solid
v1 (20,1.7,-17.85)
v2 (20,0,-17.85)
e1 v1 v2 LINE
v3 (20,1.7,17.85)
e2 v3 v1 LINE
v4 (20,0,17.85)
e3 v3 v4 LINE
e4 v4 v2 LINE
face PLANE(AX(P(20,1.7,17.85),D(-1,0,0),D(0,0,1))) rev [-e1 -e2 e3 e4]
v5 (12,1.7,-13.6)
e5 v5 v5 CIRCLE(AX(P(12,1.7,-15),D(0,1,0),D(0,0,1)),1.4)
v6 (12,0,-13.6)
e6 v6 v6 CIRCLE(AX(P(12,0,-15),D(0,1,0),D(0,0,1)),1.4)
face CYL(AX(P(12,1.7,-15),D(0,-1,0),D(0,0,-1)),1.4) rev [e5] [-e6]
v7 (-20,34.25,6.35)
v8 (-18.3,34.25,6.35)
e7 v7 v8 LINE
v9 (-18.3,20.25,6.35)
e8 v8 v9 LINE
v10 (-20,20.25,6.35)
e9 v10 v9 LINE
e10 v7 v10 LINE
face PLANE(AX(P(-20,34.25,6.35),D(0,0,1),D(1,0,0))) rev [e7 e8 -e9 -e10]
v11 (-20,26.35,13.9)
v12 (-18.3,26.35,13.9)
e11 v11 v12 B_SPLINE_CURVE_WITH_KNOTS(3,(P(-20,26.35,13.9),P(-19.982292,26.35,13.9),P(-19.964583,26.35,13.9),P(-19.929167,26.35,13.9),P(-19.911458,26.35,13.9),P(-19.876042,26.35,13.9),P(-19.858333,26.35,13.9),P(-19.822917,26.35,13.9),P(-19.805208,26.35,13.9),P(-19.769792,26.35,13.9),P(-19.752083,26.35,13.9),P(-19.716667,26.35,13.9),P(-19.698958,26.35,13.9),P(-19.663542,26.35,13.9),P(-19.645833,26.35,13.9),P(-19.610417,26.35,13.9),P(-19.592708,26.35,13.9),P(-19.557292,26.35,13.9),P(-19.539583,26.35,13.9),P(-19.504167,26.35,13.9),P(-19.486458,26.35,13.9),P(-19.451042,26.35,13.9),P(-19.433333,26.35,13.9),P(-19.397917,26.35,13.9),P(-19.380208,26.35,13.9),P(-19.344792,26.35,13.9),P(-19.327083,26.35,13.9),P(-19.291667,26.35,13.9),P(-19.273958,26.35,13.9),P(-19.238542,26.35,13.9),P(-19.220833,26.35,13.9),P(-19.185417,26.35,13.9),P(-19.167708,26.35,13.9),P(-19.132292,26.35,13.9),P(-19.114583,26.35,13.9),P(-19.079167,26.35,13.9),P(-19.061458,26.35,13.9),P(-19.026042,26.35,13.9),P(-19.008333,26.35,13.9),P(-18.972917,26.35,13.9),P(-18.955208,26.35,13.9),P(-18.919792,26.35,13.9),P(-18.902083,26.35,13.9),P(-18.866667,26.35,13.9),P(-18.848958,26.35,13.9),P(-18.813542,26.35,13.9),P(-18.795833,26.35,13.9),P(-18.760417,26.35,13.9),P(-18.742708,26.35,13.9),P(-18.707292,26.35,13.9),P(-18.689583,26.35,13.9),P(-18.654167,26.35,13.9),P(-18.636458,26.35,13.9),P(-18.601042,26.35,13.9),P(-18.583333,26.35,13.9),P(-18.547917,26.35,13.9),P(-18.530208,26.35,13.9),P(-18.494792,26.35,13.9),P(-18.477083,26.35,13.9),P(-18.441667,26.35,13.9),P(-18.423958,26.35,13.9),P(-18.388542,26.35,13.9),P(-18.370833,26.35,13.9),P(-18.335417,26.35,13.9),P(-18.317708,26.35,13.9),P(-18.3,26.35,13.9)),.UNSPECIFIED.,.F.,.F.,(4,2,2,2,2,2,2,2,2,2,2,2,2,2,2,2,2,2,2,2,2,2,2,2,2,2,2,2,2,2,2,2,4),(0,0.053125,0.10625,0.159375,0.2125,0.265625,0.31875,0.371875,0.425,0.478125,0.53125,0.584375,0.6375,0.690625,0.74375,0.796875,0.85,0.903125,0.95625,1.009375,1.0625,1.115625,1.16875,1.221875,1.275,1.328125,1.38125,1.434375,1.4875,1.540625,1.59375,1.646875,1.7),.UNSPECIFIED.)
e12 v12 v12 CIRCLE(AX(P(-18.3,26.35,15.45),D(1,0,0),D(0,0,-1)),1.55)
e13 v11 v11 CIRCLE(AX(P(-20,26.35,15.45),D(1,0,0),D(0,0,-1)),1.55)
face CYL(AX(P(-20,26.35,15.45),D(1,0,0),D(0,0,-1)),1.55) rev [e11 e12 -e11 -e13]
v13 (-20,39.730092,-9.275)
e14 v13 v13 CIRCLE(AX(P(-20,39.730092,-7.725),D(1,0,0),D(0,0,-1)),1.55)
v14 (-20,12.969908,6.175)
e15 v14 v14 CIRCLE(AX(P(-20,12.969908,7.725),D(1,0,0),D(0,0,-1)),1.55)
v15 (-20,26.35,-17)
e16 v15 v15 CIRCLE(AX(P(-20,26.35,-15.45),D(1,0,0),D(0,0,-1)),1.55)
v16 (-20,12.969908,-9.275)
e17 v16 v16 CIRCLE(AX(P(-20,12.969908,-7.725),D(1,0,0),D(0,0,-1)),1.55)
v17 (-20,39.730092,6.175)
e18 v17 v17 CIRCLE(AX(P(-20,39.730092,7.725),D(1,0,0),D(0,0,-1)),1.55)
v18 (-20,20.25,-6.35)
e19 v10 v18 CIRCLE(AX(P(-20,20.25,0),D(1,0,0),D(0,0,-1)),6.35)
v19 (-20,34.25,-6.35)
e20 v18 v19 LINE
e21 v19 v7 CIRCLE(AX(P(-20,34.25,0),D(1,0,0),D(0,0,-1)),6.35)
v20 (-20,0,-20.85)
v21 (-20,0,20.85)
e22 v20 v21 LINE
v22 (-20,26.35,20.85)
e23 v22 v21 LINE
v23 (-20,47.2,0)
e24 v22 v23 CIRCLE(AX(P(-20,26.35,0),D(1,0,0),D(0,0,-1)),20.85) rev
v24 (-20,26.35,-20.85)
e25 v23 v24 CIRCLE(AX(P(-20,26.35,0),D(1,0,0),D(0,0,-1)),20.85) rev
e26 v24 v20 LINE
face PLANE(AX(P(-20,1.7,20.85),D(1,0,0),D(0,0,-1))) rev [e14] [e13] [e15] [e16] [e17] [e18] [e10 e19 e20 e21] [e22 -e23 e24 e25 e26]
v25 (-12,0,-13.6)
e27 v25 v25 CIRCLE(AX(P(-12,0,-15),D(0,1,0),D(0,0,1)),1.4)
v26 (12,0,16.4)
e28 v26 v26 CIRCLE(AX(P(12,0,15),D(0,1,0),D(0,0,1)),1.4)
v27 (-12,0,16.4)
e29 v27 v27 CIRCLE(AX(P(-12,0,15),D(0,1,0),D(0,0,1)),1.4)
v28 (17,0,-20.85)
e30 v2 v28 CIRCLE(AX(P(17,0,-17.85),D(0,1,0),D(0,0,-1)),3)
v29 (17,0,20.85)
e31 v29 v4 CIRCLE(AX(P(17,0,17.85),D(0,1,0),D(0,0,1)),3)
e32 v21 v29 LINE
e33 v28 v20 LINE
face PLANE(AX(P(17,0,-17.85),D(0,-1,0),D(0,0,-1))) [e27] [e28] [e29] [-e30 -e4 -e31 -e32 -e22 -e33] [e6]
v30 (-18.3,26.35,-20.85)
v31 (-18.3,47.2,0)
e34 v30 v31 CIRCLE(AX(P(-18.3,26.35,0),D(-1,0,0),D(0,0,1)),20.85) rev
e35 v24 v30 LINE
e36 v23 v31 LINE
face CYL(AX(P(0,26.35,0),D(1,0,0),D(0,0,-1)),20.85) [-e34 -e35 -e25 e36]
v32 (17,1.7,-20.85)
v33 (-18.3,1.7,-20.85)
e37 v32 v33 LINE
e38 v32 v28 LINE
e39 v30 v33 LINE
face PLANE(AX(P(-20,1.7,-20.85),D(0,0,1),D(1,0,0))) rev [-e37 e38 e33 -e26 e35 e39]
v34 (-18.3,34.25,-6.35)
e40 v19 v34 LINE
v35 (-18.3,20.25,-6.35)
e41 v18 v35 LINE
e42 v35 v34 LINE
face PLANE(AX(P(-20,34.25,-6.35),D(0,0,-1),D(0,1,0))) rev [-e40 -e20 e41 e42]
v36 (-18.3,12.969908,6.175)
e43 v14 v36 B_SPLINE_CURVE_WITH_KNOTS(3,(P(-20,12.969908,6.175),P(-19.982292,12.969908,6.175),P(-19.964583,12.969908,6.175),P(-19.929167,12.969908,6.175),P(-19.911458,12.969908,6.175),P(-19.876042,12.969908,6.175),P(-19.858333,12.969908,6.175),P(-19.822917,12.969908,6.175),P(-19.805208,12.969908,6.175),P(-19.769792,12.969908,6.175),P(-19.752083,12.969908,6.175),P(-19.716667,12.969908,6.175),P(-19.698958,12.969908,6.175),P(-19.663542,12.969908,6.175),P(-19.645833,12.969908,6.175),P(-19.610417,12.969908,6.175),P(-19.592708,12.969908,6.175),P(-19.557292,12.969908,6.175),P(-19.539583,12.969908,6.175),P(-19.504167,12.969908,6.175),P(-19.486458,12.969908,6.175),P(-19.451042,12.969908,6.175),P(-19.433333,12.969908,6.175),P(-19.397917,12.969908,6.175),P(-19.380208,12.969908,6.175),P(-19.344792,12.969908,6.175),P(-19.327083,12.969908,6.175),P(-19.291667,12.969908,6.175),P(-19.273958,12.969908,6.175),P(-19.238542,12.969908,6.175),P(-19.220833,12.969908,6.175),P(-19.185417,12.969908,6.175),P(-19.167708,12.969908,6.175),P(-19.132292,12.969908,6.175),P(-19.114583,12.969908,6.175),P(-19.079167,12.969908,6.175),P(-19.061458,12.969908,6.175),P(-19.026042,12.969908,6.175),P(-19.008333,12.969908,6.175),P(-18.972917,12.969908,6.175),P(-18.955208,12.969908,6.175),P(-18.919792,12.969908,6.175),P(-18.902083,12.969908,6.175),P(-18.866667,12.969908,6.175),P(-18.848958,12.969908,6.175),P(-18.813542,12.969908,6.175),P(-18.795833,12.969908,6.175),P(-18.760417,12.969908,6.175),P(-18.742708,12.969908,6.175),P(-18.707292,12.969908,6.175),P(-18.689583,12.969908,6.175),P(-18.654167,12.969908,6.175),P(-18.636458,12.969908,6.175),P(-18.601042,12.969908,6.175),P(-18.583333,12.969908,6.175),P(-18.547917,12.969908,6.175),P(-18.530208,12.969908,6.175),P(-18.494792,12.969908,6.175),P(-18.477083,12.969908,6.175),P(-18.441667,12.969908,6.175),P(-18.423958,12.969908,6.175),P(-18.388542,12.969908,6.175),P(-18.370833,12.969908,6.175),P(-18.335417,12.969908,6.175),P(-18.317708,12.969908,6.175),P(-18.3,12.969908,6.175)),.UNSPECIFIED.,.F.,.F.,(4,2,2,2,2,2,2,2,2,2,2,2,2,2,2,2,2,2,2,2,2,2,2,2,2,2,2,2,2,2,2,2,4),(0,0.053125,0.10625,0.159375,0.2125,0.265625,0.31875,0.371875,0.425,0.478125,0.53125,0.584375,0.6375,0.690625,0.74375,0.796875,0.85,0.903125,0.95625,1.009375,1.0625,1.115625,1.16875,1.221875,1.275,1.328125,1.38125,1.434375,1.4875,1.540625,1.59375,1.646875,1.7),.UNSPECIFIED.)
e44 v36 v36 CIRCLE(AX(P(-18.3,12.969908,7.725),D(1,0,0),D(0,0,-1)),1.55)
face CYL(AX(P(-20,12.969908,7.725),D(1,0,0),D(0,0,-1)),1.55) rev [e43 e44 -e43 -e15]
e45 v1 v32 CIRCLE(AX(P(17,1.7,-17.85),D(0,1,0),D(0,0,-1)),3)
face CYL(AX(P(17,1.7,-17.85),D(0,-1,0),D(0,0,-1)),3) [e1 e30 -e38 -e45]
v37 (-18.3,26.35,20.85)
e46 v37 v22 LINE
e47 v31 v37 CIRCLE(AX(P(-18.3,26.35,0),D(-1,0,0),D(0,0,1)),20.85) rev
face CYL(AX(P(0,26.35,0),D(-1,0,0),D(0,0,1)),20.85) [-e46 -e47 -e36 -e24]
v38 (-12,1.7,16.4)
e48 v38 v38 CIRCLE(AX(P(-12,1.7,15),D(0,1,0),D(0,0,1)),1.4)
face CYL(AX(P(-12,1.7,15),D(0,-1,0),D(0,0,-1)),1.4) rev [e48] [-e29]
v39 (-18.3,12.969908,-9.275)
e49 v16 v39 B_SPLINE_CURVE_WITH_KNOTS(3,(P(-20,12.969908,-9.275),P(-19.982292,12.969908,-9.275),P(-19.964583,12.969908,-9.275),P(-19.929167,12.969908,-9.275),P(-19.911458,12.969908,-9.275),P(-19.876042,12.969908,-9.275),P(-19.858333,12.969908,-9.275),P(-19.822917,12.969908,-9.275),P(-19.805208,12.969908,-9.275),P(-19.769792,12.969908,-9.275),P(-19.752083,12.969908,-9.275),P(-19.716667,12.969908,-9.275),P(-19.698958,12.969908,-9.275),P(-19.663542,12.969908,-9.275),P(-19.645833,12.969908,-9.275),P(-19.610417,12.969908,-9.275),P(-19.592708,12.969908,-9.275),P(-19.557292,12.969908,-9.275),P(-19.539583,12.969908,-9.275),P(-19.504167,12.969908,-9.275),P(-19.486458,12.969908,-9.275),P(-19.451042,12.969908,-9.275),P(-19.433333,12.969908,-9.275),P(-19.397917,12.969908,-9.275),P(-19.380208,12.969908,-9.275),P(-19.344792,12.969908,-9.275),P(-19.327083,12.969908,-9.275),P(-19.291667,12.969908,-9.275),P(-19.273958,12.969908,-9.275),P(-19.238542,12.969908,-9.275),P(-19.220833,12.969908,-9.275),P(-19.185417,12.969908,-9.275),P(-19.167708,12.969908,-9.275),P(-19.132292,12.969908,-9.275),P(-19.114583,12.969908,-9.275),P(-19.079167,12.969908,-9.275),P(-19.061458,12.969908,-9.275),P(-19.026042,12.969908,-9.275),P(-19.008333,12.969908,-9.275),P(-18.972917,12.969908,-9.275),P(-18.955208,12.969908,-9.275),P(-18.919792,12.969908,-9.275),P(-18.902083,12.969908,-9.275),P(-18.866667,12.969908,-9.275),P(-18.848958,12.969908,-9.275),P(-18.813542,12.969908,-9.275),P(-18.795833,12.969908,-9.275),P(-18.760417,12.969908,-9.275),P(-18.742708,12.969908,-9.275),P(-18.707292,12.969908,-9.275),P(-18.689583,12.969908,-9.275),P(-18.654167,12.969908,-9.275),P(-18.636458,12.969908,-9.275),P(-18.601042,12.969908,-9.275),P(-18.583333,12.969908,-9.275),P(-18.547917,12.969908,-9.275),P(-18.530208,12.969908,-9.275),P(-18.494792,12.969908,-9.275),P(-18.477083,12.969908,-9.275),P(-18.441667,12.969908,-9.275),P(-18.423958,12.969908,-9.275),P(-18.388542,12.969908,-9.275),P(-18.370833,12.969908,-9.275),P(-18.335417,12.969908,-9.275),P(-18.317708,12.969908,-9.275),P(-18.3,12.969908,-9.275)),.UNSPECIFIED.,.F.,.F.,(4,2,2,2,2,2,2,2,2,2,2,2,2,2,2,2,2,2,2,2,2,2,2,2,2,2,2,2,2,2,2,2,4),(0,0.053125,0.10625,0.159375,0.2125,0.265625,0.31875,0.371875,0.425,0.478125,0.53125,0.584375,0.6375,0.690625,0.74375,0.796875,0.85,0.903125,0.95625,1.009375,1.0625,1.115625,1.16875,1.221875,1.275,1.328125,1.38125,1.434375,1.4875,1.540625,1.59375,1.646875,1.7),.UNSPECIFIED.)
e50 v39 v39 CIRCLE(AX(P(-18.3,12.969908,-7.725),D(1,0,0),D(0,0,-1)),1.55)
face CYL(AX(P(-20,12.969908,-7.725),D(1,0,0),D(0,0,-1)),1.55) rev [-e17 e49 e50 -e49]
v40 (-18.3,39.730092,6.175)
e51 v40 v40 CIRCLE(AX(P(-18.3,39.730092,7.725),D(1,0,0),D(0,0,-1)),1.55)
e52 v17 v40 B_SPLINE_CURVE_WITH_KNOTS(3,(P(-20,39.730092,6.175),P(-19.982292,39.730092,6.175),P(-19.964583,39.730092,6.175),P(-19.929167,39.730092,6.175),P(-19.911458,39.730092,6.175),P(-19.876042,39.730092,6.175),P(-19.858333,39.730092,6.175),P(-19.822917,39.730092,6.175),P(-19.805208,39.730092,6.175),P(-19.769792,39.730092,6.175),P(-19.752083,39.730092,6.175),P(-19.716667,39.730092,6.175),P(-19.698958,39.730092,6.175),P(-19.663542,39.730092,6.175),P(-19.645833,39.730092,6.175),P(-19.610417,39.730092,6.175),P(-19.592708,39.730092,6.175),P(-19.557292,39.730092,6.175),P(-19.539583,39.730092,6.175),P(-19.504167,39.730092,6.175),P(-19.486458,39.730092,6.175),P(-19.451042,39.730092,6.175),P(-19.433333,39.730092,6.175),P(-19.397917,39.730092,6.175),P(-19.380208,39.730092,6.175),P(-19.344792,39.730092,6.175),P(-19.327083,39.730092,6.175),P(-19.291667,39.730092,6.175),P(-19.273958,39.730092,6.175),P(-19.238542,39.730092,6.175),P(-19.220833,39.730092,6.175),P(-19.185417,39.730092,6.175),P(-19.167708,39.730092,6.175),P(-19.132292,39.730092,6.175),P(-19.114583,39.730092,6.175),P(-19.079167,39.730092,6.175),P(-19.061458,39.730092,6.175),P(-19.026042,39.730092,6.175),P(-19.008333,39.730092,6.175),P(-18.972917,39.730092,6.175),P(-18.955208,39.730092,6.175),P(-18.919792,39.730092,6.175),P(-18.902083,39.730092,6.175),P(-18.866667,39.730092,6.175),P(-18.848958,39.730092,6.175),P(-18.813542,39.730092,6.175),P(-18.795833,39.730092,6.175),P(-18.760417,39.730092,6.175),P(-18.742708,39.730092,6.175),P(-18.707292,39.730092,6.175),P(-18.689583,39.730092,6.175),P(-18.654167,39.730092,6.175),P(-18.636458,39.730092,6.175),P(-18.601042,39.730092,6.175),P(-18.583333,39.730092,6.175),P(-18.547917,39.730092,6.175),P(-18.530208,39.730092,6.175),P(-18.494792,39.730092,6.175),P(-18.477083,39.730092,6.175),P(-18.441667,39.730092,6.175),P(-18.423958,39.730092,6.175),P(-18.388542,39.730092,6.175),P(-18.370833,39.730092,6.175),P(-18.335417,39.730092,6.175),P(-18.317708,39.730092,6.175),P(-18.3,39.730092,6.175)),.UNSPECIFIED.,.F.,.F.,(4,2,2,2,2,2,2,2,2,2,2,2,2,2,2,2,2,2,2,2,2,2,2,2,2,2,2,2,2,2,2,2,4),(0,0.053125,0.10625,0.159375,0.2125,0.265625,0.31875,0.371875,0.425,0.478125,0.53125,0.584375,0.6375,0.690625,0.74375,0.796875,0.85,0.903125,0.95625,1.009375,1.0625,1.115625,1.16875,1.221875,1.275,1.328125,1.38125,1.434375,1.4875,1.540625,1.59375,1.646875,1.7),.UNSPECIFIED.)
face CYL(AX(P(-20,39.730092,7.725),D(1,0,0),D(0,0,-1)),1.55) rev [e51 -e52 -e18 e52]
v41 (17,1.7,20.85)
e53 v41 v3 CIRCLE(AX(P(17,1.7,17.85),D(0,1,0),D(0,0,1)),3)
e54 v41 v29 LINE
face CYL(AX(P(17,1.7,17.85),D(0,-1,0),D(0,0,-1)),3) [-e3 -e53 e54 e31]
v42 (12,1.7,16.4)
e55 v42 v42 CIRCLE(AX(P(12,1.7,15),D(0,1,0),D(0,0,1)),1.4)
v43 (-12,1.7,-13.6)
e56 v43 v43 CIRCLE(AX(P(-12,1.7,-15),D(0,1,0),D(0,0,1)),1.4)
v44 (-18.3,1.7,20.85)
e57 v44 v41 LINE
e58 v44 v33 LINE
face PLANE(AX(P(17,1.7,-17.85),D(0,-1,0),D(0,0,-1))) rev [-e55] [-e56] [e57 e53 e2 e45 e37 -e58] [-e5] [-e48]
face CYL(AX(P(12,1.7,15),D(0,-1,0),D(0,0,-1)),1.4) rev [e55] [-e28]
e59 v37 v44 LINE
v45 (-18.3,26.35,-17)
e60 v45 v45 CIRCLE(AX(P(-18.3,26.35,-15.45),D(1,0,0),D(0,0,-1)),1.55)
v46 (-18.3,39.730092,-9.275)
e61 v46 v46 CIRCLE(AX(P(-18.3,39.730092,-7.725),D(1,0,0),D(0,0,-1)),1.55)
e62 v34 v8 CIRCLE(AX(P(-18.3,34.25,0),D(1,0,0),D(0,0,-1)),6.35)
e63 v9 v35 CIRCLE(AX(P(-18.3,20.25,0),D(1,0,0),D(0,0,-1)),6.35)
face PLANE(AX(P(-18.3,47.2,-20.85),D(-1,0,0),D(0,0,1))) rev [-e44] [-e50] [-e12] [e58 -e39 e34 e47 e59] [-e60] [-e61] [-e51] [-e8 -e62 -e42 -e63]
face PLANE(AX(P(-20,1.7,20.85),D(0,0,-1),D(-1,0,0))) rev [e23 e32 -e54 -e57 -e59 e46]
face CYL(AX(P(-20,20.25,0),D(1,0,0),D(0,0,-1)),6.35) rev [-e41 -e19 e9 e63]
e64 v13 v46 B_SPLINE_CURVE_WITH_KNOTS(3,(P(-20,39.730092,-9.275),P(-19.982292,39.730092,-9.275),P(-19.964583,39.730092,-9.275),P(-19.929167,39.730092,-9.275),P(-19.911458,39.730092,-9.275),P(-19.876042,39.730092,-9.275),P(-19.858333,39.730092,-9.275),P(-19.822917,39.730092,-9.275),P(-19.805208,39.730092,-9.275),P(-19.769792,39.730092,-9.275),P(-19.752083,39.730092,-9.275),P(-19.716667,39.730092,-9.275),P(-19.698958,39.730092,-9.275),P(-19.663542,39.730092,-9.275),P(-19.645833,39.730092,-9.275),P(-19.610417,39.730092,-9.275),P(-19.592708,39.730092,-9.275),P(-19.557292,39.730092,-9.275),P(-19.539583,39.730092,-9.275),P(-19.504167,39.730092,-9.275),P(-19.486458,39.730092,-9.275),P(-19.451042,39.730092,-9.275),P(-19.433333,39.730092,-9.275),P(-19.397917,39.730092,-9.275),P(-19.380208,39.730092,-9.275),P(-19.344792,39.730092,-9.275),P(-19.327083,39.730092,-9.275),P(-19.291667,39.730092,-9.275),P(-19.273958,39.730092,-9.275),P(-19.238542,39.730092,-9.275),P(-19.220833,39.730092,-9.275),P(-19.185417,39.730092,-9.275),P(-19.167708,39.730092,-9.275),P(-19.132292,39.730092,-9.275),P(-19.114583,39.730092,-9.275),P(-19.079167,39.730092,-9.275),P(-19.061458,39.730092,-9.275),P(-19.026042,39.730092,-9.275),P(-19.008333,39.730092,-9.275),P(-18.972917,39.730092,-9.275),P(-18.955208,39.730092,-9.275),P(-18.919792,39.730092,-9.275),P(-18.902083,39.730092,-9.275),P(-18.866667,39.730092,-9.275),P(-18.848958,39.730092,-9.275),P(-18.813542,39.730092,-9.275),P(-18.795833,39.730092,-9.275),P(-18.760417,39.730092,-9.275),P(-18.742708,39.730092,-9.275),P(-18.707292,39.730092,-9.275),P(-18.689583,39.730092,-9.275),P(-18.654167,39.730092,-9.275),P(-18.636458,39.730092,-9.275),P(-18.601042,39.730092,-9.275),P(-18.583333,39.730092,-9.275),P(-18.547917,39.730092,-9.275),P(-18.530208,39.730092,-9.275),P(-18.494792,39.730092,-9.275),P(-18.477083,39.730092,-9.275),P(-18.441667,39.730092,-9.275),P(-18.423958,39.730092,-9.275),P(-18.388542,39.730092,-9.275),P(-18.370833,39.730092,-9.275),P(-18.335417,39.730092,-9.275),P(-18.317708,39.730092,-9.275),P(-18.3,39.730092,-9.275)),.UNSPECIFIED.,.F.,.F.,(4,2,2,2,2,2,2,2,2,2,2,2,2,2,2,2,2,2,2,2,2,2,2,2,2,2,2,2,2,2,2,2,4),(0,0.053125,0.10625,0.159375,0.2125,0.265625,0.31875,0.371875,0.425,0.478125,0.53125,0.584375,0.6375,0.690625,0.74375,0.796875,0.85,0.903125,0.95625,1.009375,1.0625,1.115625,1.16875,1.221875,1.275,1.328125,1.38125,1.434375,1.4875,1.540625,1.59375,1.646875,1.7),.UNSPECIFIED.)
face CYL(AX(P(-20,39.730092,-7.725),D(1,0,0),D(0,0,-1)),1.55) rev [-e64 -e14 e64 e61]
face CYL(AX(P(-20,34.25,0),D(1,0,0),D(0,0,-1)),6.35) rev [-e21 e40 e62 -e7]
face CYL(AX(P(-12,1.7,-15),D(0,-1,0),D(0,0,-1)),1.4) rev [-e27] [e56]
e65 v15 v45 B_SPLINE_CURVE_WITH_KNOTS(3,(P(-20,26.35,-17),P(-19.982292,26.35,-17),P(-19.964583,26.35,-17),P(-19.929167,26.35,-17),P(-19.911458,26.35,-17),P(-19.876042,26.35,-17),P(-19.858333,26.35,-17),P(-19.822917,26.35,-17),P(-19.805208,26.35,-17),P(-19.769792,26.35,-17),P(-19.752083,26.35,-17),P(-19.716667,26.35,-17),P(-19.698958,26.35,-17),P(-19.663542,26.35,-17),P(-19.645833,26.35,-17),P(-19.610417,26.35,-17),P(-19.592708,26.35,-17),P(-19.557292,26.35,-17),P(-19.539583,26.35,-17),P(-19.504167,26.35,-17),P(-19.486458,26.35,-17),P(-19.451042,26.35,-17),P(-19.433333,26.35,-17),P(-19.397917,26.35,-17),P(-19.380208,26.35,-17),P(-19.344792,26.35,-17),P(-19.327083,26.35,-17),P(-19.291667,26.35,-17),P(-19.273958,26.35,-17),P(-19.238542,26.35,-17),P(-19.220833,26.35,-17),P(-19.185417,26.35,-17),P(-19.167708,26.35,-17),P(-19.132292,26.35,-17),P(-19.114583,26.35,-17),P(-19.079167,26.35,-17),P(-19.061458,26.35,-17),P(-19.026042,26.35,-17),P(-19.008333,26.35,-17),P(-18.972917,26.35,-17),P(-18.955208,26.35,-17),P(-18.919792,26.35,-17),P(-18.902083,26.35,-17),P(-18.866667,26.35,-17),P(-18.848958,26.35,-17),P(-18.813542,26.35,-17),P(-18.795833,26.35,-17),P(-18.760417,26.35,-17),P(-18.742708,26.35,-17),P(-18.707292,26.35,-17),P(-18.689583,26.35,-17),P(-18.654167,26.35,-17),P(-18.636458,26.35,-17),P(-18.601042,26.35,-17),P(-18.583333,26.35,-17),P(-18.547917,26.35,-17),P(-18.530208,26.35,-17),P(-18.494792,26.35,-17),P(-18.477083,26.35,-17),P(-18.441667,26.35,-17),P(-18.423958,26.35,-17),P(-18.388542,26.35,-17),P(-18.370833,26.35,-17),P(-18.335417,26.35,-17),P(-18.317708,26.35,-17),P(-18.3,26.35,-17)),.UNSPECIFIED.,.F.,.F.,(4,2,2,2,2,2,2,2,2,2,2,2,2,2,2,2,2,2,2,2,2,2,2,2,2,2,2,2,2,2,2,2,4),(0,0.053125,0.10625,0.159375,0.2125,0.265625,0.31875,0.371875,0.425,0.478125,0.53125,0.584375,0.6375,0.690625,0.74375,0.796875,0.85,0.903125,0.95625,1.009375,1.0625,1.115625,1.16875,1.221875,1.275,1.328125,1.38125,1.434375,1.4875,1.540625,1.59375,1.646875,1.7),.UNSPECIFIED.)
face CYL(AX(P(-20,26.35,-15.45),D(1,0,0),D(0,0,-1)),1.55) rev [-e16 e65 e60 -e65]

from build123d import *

# Parameters (mm, degrees)
CROQUIS1_R              = 1.4
SALIENTE_EXTRUIR1_DEPTH = 1.7
CROQUIS2_W              = 1.7
CROQUIS2_H              = 41.7
SALIENTE_EXTRUIR2_DEPTH = 45.5
REDONDEO1_R             = 20.85
CROQUIS3_R              = 1.55
CORTAR_EXTRUIR1_DEPTH   = 65.26081621


with BuildPart() as part:
    # Croquis1 → Saliente-Extruir1 (new body)
    with BuildSketch(Plane(origin=(0, 0, 0), x_dir=(1, 0, 0), z_dir=(0, 1, 0))):
        with BuildLine():
            Line((-20, -20.85), (17, -20.85))
            ThreePointArc((17, -20.85), (19.121320344, -19.971320344), (20, -17.85))
            Line((20, -17.85), (20, 17.85))
            ThreePointArc((20, 17.85), (19.121320344, 19.971320344), (17, 20.85))
            Line((17, 20.85), (-20, 20.85))
            Line((-20, 20.85), (-20, -20.85))
        make_face()
        with Locations(Location((-12, 15, 0), (0, 0, 270))):
            Circle(CROQUIS1_R, mode=Mode.SUBTRACT)
        with Locations(Location((12, 15, 0), (0, 0, 270))):
            Circle(CROQUIS1_R, mode=Mode.SUBTRACT)
        with Locations(Location((12, -15, 0), (0, 0, 270))):
            Circle(CROQUIS1_R, mode=Mode.SUBTRACT)
        with Locations(Location((-12, -15, 0), (0, 0, 270))):
            Circle(CROQUIS1_R, mode=Mode.SUBTRACT)
    extrude(amount=SALIENTE_EXTRUIR1_DEPTH)

    # Croquis2 → Saliente-Extruir2 (add)
    with BuildSketch(Plane(origin=(0, 1.7, 0), x_dir=(1, 0, 0), z_dir=(0, 1, 0))):
        with Locations((-19.15, 0)):
            Rectangle(CROQUIS2_W, CROQUIS2_H)
    extrude(amount=SALIENTE_EXTRUIR2_DEPTH)

    # Redondeo1
    redondeo1_edges = [part.edges().sort_by_distance(p)[0] for p in [
        (-19.15, 47.2, -20.85),
        (-19.15, 47.2, 20.85),
    ]]
    fillet(redondeo1_edges, radius=REDONDEO1_R - 0.0001)  # a hair under: the kernel refuses the full size

    # Croquis3 → Cortar-Extruir1 (cut, through all)
    with BuildSketch(Plane(origin=(-18.3, 0, 0), x_dir=(0, 0, -1), z_dir=(1, 0, 0))):
        with Locations((15.45, 26.35)):
            Circle(CROQUIS3_R)
        with Locations((7.725, 12.969907512)):
            Circle(CROQUIS3_R)
        with Locations((-7.725, 12.969907512)):
            Circle(CROQUIS3_R)
        with Locations((-15.45, 26.35)):
            Circle(CROQUIS3_R)
        with Locations((-7.725, 39.730092488)):
            Circle(CROQUIS3_R)
        with Locations((7.725, 39.730092488)):
            Circle(CROQUIS3_R)
        with BuildLine():
            Line((6.35, 34.25), (6.35, 20.25))
            ThreePointArc((6.35, 20.25), (0, 13.9), (-6.35, 20.25))
            Line((-6.35, 20.25), (-6.35, 34.25))
            ThreePointArc((-6.35, 34.25), (0, 40.6), (6.35, 34.25))
        make_face()
    extrude(amount=-CORTAR_EXTRUIR1_DEPTH, mode=Mode.SUBTRACT)


solid = part.part
